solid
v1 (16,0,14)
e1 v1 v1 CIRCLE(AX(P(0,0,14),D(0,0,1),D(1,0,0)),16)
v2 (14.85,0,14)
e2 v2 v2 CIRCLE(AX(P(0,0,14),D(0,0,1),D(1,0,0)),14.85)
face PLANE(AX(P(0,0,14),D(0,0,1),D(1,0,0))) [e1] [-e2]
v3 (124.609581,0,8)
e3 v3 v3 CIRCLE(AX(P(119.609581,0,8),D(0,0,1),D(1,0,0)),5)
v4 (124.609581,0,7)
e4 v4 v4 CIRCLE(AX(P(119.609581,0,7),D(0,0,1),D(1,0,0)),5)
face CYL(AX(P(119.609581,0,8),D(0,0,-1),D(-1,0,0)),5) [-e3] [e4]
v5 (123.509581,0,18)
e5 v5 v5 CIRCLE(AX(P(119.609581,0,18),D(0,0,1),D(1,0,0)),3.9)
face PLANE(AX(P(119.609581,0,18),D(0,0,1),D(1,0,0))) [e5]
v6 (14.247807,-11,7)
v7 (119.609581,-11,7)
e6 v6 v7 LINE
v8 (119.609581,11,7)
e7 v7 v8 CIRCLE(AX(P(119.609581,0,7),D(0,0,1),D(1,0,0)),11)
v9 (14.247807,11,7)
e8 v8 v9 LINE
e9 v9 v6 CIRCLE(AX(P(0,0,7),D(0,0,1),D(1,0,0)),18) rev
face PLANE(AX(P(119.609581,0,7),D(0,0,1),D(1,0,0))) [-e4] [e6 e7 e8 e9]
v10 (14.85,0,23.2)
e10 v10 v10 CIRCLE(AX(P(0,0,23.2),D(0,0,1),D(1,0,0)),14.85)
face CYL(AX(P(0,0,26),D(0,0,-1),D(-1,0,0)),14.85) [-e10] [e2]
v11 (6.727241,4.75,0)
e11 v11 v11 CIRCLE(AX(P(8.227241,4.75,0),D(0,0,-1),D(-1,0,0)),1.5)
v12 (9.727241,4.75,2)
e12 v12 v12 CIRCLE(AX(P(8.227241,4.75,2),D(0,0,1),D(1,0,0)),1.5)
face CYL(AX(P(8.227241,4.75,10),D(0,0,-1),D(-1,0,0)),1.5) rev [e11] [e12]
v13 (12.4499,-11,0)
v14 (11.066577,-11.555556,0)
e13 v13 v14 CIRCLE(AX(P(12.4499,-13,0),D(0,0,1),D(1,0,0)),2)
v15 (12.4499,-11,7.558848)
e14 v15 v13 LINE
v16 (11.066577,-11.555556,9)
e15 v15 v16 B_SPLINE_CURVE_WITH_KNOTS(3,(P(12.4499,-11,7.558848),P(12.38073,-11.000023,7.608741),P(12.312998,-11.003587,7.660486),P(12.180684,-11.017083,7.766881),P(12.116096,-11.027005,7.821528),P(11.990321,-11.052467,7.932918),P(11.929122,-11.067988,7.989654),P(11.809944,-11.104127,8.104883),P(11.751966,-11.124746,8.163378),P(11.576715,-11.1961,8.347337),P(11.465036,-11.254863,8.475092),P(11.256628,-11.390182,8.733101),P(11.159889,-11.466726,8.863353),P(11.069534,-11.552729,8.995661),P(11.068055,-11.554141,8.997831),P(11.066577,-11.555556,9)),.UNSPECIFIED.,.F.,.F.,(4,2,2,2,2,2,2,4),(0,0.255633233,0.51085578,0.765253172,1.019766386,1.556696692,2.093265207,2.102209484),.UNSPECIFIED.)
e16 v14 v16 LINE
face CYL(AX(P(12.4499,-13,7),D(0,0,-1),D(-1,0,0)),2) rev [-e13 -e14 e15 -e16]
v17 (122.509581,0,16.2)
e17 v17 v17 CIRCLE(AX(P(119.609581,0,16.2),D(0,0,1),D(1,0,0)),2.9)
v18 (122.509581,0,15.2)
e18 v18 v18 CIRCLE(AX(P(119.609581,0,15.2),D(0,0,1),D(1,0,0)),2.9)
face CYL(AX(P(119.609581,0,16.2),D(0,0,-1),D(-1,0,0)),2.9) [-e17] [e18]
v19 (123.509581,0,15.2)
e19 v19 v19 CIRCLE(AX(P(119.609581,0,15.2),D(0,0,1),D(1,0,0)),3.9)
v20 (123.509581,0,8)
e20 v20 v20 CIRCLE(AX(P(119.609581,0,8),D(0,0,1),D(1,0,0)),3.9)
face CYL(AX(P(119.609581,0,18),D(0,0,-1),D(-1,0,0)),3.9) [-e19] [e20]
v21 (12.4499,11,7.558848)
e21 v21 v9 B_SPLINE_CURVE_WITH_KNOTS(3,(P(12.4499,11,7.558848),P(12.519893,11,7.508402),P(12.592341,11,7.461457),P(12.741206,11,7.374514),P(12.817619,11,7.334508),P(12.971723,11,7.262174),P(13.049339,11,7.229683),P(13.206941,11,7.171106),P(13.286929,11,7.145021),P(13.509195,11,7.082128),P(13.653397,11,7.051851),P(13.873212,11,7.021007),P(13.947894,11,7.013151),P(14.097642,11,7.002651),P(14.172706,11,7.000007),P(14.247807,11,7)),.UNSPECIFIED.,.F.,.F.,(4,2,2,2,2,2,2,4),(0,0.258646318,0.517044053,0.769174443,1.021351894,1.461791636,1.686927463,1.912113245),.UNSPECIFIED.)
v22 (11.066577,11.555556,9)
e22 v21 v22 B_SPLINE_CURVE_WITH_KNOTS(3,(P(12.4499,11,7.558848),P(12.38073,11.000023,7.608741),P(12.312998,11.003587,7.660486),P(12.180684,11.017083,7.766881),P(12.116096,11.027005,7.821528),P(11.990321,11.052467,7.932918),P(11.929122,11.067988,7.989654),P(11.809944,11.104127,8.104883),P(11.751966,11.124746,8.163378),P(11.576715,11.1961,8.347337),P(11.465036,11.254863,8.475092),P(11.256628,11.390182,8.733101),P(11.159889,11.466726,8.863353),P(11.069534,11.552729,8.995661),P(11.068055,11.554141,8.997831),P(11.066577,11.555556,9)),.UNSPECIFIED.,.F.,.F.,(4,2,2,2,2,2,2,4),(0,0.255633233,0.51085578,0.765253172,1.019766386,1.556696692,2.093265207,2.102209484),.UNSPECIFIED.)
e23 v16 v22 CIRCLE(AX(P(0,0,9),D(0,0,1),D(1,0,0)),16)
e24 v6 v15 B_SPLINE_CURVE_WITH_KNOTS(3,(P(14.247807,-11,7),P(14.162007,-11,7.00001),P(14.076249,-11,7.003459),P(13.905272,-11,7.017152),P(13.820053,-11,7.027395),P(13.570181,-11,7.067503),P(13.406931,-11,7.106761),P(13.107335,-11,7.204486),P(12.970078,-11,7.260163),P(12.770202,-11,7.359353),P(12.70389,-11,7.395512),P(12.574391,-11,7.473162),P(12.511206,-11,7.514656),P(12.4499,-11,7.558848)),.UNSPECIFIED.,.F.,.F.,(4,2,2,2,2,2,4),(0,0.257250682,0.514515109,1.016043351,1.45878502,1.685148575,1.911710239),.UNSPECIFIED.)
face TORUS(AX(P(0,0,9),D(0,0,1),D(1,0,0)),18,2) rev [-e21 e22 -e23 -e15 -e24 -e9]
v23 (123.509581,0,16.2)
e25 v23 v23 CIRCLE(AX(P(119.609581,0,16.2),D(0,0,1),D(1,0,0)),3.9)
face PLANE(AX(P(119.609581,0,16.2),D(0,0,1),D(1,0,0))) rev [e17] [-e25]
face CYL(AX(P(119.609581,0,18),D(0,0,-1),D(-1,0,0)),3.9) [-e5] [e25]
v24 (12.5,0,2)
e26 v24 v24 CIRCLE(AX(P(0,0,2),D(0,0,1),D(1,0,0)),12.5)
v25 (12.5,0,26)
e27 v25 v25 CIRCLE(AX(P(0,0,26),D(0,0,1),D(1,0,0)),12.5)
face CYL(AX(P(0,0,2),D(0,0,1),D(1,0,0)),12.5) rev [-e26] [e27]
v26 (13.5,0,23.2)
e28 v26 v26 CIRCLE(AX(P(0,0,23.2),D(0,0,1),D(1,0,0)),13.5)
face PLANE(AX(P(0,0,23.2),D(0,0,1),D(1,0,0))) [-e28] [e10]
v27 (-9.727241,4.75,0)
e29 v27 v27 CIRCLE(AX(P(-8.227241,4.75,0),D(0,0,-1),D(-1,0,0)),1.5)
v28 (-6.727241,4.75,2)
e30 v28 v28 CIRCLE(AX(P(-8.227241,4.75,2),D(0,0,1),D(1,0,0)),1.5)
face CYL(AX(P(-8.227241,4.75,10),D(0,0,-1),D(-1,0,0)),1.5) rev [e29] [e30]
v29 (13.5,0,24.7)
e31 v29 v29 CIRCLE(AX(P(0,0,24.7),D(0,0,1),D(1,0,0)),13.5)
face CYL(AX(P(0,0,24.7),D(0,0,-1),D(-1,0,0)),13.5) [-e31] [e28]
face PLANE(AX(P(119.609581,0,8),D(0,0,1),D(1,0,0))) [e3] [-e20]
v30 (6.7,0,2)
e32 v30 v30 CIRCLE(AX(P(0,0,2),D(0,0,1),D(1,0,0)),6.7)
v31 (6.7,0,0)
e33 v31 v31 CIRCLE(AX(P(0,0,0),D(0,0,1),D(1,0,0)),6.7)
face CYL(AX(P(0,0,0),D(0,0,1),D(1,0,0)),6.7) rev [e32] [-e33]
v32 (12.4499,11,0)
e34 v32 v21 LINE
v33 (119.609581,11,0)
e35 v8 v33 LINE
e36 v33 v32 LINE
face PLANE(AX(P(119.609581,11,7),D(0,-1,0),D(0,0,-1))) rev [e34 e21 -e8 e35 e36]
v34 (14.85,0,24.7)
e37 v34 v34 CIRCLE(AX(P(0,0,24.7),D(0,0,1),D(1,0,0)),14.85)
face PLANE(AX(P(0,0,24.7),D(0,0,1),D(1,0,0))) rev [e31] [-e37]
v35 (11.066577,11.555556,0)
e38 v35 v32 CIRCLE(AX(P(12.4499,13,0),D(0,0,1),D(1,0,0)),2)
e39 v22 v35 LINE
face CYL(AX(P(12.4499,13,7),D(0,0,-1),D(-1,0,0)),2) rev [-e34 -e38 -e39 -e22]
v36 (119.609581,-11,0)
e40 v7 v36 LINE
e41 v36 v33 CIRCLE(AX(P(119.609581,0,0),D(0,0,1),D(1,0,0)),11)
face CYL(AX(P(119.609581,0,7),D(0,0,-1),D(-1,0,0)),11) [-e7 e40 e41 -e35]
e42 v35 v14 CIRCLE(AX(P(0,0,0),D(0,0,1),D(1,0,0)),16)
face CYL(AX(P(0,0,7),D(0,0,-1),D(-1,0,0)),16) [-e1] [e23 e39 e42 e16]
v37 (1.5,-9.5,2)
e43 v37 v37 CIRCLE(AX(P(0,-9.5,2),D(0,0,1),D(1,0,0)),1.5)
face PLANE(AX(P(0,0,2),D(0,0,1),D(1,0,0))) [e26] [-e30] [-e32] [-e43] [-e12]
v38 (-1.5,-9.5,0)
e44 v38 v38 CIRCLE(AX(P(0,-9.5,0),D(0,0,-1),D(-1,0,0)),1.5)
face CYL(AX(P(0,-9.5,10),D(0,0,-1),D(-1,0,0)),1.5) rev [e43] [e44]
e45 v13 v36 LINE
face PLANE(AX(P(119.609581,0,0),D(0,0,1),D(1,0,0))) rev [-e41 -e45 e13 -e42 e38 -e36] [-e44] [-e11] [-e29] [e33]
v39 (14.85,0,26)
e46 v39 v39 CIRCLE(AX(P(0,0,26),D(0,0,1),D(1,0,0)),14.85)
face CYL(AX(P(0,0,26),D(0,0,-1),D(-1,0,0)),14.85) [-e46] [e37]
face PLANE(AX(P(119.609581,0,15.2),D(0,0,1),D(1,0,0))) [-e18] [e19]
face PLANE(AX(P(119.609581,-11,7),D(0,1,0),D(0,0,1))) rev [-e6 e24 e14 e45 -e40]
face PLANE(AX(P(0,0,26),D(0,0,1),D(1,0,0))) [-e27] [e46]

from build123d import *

# Parameters (mm, degrees)
EXTRUDE_1_DEPTH     = 7
SKETCH_2_R          = 6.7
CUT_EXTRUDE_1_DEPTH = 7
SKETCH_3_R          = 12.5
SKETCH_3_R_2        = 6.7
CUT_EXTRUDE_2_DEPTH = 5
SKETCH_4_R          = 16
SKETCH_4_R_2        = 12.5
EXTRUDE_2_DEPTH     = 7
SKETCH_5_R          = 14.850000000000001
SKETCH_5_R_2        = 12.5
EXTRUDE_3_DEPTH     = 12
SKETCH_6_R          = 5.000000000000004
EXTRUDE_4_DEPTH     = 1
SKETCH_7_R          = 3.899999999999998
EXTRUDE_5_DEPTH     = 10
FILLET_1_R          = 2
SKETCH_8_R          = 1.4999999999999998
SKETCH_8_R_2        = 1.5000000000000002
SKETCH_8_R_3        = 1.4999999999999991
CUT_EXTRUDE_3_DEPTH = 10
SKETCH_9_R          = 14.850000000000001
SKETCH_9_R_2        = 13.5
CUT_EXTRUDE_4_DEPTH = 1.5
SKETCH_10_R         = 3.899999999999998
SKETCH_10_R_2       = 2.9
CUT_EXTRUDE_5_DEPTH = 1


with BuildPart() as part:
    # 草图1 → 凸台-拉伸1 (new body)
    with BuildSketch(Plane.XY):
        with BuildLine():
            Line((119.60958057927934, 11), (11.61895003862225, 11))
            ThreePointArc((11.61895003862225, 11), (-16, 1.96e-15), (11.61895003862225, -11))
            Line((11.61895003862225, -11), (119.60958057927934, -11))
            ThreePointArc((119.60958057927934, -11), (130.60958057927934, 0), (119.60958057927934, 11))
        make_face()
    extrude(amount=EXTRUDE_1_DEPTH)

    # 草图2 → 切除-拉伸1 (cut)
    with BuildSketch(Plane.XY.offset(7)):
        Circle(SKETCH_2_R)
    extrude(amount=-CUT_EXTRUDE_1_DEPTH, mode=Mode.SUBTRACT)

    # 草图3 → 切除-拉伸2 (cut)
    with BuildSketch(Plane.XY.offset(7)):
        Circle(SKETCH_3_R)
        Circle(SKETCH_3_R_2, mode=Mode.SUBTRACT)
    extrude(amount=-CUT_EXTRUDE_2_DEPTH, mode=Mode.SUBTRACT)

    # 草图4 → 凸台-拉伸2 (add)
    with BuildSketch(Plane.XY.offset(7)):
        Circle(SKETCH_4_R)
        Circle(SKETCH_4_R_2, mode=Mode.SUBTRACT)
    extrude(amount=EXTRUDE_2_DEPTH)

    # 草图5 → 凸台-拉伸3 (add)
    with BuildSketch(Plane.XY.offset(14)):
        Circle(SKETCH_5_R)
        Circle(SKETCH_5_R_2, mode=Mode.SUBTRACT)
    extrude(amount=EXTRUDE_3_DEPTH)

    # 草图6 → 凸台-拉伸4 (add)
    with BuildSketch(Plane.XY.offset(7)):
        with Locations((119.60958057927934, 0)):
            Circle(SKETCH_6_R)
    extrude(amount=EXTRUDE_4_DEPTH)

    # 草图7 → 凸台-拉伸5 (add)
    with BuildSketch(Plane.XY.offset(8)):
        with Locations((119.60958057927934, 0)):
            Circle(SKETCH_7_R)
    extrude(amount=EXTRUDE_5_DEPTH)

    # 圆角1
    fillet_1_edges = [part.edges().sort_by_distance(p)[0] for p in [
        (11.618950038622248, -11.000000000000002, 3.5),
        (11.61895003862225, 11, 3.5),
        (14.864440800412844, 5.920168890413684, 7),
    ]]
    fillet(fillet_1_edges, radius=FILLET_1_R)

    # 草图8 → 切除-拉伸3 (cut)
    with BuildSketch(Plane(origin=(0, 0, 0), x_dir=(-1, 0, 0), z_dir=(0, 0, -1))):
        with Locations((0, -9.5)):
            Circle(SKETCH_8_R)
        with Locations((-8.227241335952145, 4.75000000000004)):
            Circle(SKETCH_8_R_2)
        with Locations((8.22724133595221, 4.749999999999924)):
            Circle(SKETCH_8_R_3)
    extrude(amount=-CUT_EXTRUDE_3_DEPTH, mode=Mode.SUBTRACT)

    # 草图9 → 切除-拉伸4 (cut)
    with BuildSketch(Plane.XY.offset(23.200000000000003)):
        Circle(SKETCH_9_R)
        Circle(SKETCH_9_R_2, mode=Mode.SUBTRACT)
    extrude(amount=CUT_EXTRUDE_4_DEPTH, mode=Mode.SUBTRACT)

    # 草图10 → 切除-拉伸5 (cut)
    with BuildSketch(Plane.XY.offset(15.200000000000001)):
        with Locations((119.60958057927934, 0)):
            Circle(SKETCH_10_R)
        with Locations((119.60958057927934, 0)):
            Circle(SKETCH_10_R_2, mode=Mode.SUBTRACT)
    extrude(amount=CUT_EXTRUDE_5_DEPTH, mode=Mode.SUBTRACT)


solid = part.part
